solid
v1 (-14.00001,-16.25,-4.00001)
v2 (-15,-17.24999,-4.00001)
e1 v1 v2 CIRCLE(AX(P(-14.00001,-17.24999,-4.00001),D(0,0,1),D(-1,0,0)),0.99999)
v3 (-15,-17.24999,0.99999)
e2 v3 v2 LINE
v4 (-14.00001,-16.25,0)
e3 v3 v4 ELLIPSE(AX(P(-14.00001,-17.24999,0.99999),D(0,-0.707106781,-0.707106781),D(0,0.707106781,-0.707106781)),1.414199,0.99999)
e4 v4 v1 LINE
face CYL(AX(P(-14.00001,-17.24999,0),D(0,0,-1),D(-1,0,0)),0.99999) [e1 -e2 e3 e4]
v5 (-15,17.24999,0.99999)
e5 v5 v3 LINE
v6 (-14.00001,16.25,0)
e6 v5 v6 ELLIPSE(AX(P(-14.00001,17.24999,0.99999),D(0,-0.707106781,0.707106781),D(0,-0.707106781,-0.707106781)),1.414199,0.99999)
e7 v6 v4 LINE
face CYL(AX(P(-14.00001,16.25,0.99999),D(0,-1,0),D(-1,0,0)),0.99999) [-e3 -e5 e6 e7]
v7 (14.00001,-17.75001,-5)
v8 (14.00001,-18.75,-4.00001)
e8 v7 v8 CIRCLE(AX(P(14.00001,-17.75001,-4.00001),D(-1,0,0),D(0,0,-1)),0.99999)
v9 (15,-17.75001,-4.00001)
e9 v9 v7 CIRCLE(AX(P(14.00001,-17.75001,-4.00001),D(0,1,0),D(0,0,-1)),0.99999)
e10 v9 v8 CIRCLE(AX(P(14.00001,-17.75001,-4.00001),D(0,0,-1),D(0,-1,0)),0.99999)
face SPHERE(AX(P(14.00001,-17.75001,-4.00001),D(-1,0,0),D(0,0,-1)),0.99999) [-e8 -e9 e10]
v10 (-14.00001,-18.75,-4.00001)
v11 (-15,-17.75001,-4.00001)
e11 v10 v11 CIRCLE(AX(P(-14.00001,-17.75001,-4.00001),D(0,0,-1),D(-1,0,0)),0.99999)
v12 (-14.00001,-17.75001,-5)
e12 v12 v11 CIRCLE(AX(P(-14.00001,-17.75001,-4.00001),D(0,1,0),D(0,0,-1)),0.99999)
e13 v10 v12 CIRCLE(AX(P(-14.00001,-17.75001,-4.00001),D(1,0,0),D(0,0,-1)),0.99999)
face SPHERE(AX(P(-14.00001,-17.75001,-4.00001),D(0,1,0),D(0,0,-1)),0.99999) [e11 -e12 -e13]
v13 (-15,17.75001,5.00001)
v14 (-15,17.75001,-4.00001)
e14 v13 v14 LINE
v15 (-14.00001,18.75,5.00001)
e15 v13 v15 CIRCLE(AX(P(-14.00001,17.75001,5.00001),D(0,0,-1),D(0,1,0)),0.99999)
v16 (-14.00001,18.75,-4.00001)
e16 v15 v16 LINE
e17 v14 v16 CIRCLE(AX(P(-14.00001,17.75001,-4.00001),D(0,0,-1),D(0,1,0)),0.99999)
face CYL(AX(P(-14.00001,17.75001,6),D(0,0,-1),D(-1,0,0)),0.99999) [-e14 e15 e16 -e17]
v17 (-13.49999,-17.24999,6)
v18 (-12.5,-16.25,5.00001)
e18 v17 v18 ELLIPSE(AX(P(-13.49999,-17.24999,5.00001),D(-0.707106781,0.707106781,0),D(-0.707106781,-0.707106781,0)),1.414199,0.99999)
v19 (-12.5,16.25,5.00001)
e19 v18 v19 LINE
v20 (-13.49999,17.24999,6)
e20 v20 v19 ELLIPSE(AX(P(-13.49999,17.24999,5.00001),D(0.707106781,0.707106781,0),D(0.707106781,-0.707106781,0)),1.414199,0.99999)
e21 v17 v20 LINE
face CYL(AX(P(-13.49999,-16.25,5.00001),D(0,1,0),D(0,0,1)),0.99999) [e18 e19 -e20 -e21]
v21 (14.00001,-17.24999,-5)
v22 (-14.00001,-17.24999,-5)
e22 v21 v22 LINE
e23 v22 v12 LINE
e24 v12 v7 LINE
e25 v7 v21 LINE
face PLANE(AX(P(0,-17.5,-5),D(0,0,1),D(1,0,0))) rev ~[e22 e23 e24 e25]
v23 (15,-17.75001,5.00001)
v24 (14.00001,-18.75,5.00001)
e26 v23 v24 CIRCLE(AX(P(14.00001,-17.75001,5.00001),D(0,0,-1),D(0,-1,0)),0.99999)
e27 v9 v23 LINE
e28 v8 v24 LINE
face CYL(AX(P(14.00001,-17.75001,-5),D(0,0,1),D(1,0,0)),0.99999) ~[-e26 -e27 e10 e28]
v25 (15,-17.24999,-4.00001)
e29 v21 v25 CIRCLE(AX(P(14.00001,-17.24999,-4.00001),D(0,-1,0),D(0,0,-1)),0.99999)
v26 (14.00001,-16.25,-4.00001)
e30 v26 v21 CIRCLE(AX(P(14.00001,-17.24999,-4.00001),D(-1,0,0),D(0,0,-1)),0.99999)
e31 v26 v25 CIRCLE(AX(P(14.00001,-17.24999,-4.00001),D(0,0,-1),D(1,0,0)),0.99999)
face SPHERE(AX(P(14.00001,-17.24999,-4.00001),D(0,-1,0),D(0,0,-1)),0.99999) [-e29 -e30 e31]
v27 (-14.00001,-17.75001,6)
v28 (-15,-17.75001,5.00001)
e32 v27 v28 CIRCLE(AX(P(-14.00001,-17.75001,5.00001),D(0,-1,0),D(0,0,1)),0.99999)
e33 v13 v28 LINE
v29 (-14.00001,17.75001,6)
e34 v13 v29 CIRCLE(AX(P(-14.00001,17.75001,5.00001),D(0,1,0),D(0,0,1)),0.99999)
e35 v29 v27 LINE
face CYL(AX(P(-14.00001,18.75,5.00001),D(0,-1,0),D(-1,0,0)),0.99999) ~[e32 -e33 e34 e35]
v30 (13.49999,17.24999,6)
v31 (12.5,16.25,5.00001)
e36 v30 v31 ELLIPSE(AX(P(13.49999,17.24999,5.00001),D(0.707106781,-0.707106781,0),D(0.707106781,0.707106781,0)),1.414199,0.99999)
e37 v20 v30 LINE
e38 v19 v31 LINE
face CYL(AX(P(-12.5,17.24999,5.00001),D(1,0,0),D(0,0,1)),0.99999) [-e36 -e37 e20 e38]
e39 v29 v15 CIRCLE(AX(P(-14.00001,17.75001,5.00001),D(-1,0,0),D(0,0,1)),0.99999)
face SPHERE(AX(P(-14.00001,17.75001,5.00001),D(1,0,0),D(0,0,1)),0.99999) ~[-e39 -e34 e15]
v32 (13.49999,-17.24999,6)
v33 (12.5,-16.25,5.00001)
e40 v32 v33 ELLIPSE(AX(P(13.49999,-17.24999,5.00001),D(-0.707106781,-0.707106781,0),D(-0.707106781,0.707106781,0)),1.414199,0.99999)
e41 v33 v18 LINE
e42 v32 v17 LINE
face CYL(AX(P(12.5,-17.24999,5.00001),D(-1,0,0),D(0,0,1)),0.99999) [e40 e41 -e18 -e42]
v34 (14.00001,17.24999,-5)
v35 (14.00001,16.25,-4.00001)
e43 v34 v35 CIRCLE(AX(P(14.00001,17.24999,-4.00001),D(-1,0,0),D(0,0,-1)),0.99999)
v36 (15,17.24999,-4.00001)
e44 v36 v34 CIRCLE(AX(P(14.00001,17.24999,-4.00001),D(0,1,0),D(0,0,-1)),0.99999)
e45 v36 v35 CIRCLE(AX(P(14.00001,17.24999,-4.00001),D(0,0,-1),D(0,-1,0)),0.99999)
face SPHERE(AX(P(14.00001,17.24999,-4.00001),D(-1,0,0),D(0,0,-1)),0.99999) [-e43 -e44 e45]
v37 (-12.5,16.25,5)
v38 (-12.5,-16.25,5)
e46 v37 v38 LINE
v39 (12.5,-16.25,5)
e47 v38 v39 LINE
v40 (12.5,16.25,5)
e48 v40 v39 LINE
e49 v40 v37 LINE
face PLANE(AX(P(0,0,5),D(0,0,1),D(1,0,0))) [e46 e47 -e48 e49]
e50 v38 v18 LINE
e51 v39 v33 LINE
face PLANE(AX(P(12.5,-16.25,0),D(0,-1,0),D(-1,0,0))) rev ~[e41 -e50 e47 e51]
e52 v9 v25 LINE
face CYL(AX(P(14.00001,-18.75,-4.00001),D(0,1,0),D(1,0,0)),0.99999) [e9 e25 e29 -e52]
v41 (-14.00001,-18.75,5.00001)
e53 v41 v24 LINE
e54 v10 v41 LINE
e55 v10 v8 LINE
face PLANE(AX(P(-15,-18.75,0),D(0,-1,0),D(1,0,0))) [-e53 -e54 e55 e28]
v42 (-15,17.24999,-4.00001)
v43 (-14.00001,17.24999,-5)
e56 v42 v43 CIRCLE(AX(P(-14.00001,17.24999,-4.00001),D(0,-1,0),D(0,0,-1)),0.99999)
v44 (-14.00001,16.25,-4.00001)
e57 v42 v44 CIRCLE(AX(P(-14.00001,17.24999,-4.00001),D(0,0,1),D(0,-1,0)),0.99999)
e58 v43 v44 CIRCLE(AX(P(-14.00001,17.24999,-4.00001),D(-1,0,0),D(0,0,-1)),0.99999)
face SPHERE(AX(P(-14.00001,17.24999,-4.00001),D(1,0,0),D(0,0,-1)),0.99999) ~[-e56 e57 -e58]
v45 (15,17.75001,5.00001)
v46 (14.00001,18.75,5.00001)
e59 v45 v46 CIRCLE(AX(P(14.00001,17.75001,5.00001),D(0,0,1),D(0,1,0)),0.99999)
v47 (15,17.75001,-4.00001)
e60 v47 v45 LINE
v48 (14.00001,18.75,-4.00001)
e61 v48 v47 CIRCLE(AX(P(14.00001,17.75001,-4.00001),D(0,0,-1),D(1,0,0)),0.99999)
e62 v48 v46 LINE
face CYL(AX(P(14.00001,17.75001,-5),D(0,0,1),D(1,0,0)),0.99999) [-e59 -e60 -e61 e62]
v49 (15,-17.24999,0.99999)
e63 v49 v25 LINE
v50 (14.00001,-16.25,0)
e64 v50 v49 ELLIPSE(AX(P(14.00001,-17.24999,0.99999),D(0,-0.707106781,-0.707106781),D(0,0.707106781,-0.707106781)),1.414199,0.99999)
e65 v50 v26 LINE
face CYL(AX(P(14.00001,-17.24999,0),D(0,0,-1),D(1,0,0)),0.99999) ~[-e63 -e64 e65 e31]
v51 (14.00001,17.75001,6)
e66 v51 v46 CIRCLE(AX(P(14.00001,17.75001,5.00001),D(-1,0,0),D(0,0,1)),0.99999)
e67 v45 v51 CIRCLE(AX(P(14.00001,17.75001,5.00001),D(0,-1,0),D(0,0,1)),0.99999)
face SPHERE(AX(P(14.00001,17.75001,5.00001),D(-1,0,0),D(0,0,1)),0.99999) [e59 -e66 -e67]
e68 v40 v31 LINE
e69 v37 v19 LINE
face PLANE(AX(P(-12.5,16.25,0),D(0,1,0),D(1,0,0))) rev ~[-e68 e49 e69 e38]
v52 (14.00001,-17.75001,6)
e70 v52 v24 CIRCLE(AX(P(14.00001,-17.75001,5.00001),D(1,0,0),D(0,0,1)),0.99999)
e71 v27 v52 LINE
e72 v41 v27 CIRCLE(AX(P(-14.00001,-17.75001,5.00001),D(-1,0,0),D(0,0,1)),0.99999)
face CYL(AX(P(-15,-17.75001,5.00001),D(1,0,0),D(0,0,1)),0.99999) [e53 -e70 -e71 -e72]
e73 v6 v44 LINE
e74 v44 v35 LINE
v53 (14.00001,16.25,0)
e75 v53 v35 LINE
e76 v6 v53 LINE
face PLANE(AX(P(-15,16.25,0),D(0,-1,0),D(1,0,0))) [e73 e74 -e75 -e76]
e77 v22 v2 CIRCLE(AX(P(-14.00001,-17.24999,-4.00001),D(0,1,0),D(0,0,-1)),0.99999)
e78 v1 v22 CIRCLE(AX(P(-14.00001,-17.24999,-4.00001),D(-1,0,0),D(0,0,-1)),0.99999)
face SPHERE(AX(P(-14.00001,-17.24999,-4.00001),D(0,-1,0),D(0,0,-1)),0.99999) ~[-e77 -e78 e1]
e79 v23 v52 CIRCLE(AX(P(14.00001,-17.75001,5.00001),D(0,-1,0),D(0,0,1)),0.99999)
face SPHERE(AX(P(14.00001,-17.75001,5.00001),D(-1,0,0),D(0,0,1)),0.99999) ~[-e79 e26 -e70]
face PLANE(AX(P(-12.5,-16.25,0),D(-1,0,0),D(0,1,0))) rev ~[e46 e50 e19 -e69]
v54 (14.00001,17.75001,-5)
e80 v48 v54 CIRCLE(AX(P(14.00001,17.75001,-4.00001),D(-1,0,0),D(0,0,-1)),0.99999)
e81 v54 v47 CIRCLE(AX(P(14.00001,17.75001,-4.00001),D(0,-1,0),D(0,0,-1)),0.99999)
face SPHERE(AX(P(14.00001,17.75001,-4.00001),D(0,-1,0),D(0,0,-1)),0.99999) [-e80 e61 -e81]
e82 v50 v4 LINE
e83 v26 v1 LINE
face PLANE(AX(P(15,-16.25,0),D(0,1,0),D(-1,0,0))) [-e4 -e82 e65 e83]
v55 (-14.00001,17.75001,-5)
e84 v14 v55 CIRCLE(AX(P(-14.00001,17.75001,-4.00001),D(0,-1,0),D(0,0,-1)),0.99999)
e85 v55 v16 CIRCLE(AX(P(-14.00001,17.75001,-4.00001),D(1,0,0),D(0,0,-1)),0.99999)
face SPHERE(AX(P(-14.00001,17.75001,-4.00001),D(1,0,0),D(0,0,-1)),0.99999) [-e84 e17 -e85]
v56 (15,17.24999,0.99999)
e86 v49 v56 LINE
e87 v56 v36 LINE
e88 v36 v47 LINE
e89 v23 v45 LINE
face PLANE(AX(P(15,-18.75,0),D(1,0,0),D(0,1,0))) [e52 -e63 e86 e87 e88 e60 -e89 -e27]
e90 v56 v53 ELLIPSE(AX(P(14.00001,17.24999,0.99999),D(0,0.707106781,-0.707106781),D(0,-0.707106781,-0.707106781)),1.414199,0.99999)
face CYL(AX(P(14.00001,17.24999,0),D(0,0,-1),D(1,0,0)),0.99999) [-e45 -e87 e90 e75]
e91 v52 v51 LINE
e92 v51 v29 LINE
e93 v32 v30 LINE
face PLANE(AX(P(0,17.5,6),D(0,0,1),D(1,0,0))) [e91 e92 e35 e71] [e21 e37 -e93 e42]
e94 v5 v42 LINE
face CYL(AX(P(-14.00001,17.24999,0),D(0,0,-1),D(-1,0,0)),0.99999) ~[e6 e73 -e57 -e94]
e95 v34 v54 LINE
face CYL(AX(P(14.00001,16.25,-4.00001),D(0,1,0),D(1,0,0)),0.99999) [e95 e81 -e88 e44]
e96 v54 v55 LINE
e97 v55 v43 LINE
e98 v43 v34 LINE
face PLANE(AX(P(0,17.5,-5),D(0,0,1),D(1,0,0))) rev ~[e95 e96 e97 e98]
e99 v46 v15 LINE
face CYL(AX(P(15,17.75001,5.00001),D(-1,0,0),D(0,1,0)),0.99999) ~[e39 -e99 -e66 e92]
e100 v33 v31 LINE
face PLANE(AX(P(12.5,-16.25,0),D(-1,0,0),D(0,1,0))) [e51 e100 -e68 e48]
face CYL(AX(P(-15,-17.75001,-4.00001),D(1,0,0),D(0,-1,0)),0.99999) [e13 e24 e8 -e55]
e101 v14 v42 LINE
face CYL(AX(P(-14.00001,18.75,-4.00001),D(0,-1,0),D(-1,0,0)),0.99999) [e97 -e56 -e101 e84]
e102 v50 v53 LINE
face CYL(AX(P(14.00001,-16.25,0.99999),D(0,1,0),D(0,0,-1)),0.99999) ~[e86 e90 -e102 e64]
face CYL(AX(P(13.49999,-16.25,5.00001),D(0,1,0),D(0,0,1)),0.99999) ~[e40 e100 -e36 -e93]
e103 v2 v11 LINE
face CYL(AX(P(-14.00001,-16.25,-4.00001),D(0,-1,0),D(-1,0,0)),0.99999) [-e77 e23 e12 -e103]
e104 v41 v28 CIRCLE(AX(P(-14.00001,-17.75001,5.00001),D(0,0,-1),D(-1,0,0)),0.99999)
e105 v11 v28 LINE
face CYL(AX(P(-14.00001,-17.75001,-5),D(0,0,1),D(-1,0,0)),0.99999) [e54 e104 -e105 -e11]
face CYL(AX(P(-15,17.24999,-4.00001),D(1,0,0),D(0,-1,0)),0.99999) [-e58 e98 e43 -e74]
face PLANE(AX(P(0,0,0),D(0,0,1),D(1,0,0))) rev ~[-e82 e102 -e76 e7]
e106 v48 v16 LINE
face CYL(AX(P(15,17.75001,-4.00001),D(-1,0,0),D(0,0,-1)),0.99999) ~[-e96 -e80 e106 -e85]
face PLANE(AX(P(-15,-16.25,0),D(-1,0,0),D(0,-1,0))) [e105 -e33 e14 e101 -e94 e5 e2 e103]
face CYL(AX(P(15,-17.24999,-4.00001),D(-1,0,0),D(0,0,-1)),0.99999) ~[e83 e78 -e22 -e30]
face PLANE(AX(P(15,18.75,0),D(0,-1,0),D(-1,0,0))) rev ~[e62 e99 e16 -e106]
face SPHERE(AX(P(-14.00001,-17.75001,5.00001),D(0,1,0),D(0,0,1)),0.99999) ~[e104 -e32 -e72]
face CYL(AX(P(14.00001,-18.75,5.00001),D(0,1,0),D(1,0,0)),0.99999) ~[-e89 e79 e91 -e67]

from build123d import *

# Parameters (mm, degrees)
F0_W     = 25
F0_H     = 32.5
F0_W_2   = 2.5
F1_DEPTH = 5
F2_DEPTH = 6
F3_DEPTH = 5
F4_R     = 0.99999


# Not quite as in the source:
# - a fillet or chamfer is up to 0.001 mm smaller than in the source, because OpenCascade refuses the exact size


with BuildPart() as f1:
    # F0 (on Top) → F1 (new body)
    with BuildSketch(Plane.XY):
        Rectangle(F0_W, F0_H)
        Polygon((-15, 16.25), (-12.5, 16.25), (12.5, 16.25), (15, 16.25), (15, 18.75), (-15, 18.75), align=None)
        with Locations((-13.75, 0)):
            Rectangle(F0_W_2, F0_H)
        Polygon((12.5, -16.25), (-12.5, -16.25), (-15, -16.25), (-15, -18.75), (15, -18.75), (15, -16.25), align=None)
        with Locations((13.75, 0)):
            Rectangle(F0_W_2, F0_H)
    extrude(amount=F1_DEPTH)

    # F0 (on Top) → F2 (join)
    with BuildSketch(Plane.XY):
        Polygon((-15, 16.25), (-12.5, 16.25), (12.5, 16.25), (15, 16.25), (15, 18.75), (-15, 18.75), align=None)
        with Locations((-13.75, 0)):
            Rectangle(F0_W_2, F0_H)
        Polygon((12.5, -16.25), (-12.5, -16.25), (-15, -16.25), (-15, -18.75), (15, -18.75), (15, -16.25), align=None)
        with Locations((13.75, 0)):
            Rectangle(F0_W_2, F0_H)
    extrude(amount=F2_DEPTH)

    # F0 (on Top) → F3 (join)
    with BuildSketch(Plane.XY):
        Polygon((12.5, -16.25), (-12.5, -16.25), (-15, -16.25), (-15, -18.75), (15, -18.75), (15, -16.25), align=None)
        Polygon((-15, 16.25), (-12.5, 16.25), (12.5, 16.25), (15, 16.25), (15, 18.75), (-15, 18.75), align=None)
    extrude(amount=-F3_DEPTH)

    # F4 (radius 1 in the source; OpenCascade refuses exactly that, so slightly less here)
    f4_edges = [f1.edges().sort_by_distance(p)[0] for p in [
        (0, 16.25, -5),
        (15, 17.5, -5),
        (0, 18.75, -5),
        (-15, 17.5, -5),
        (-15, -17.5, -5),
        (0, -18.75, -5),
        (15, -17.5, -5),
        (0, -16.25, -5),
        (0, 16.25, 6),
        (12.5, 0, 6),
        (0, -16.25, 6),
        (-12.5, 0, 6),
        (0, 18.75, 6),
        (-15, 0, 6),
        (0, -18.75, 6),
        (15, 0, 6),
        (-15, -18.75, 0.5),
        (-15, -16.25, -2.5),
        (-15, 0, 0),
        (-15, 16.25, -2.5),
        (-15, 18.75, 0.5),
        (15, 18.75, 0.5),
        (15, -18.75, 0.5),
        (15, 16.25, -2.5),
        (15, 0, 0),
        (15, -16.25, -2.5),
    ]]
    fillet(f4_edges, radius=F4_R)


solid = f1.part
